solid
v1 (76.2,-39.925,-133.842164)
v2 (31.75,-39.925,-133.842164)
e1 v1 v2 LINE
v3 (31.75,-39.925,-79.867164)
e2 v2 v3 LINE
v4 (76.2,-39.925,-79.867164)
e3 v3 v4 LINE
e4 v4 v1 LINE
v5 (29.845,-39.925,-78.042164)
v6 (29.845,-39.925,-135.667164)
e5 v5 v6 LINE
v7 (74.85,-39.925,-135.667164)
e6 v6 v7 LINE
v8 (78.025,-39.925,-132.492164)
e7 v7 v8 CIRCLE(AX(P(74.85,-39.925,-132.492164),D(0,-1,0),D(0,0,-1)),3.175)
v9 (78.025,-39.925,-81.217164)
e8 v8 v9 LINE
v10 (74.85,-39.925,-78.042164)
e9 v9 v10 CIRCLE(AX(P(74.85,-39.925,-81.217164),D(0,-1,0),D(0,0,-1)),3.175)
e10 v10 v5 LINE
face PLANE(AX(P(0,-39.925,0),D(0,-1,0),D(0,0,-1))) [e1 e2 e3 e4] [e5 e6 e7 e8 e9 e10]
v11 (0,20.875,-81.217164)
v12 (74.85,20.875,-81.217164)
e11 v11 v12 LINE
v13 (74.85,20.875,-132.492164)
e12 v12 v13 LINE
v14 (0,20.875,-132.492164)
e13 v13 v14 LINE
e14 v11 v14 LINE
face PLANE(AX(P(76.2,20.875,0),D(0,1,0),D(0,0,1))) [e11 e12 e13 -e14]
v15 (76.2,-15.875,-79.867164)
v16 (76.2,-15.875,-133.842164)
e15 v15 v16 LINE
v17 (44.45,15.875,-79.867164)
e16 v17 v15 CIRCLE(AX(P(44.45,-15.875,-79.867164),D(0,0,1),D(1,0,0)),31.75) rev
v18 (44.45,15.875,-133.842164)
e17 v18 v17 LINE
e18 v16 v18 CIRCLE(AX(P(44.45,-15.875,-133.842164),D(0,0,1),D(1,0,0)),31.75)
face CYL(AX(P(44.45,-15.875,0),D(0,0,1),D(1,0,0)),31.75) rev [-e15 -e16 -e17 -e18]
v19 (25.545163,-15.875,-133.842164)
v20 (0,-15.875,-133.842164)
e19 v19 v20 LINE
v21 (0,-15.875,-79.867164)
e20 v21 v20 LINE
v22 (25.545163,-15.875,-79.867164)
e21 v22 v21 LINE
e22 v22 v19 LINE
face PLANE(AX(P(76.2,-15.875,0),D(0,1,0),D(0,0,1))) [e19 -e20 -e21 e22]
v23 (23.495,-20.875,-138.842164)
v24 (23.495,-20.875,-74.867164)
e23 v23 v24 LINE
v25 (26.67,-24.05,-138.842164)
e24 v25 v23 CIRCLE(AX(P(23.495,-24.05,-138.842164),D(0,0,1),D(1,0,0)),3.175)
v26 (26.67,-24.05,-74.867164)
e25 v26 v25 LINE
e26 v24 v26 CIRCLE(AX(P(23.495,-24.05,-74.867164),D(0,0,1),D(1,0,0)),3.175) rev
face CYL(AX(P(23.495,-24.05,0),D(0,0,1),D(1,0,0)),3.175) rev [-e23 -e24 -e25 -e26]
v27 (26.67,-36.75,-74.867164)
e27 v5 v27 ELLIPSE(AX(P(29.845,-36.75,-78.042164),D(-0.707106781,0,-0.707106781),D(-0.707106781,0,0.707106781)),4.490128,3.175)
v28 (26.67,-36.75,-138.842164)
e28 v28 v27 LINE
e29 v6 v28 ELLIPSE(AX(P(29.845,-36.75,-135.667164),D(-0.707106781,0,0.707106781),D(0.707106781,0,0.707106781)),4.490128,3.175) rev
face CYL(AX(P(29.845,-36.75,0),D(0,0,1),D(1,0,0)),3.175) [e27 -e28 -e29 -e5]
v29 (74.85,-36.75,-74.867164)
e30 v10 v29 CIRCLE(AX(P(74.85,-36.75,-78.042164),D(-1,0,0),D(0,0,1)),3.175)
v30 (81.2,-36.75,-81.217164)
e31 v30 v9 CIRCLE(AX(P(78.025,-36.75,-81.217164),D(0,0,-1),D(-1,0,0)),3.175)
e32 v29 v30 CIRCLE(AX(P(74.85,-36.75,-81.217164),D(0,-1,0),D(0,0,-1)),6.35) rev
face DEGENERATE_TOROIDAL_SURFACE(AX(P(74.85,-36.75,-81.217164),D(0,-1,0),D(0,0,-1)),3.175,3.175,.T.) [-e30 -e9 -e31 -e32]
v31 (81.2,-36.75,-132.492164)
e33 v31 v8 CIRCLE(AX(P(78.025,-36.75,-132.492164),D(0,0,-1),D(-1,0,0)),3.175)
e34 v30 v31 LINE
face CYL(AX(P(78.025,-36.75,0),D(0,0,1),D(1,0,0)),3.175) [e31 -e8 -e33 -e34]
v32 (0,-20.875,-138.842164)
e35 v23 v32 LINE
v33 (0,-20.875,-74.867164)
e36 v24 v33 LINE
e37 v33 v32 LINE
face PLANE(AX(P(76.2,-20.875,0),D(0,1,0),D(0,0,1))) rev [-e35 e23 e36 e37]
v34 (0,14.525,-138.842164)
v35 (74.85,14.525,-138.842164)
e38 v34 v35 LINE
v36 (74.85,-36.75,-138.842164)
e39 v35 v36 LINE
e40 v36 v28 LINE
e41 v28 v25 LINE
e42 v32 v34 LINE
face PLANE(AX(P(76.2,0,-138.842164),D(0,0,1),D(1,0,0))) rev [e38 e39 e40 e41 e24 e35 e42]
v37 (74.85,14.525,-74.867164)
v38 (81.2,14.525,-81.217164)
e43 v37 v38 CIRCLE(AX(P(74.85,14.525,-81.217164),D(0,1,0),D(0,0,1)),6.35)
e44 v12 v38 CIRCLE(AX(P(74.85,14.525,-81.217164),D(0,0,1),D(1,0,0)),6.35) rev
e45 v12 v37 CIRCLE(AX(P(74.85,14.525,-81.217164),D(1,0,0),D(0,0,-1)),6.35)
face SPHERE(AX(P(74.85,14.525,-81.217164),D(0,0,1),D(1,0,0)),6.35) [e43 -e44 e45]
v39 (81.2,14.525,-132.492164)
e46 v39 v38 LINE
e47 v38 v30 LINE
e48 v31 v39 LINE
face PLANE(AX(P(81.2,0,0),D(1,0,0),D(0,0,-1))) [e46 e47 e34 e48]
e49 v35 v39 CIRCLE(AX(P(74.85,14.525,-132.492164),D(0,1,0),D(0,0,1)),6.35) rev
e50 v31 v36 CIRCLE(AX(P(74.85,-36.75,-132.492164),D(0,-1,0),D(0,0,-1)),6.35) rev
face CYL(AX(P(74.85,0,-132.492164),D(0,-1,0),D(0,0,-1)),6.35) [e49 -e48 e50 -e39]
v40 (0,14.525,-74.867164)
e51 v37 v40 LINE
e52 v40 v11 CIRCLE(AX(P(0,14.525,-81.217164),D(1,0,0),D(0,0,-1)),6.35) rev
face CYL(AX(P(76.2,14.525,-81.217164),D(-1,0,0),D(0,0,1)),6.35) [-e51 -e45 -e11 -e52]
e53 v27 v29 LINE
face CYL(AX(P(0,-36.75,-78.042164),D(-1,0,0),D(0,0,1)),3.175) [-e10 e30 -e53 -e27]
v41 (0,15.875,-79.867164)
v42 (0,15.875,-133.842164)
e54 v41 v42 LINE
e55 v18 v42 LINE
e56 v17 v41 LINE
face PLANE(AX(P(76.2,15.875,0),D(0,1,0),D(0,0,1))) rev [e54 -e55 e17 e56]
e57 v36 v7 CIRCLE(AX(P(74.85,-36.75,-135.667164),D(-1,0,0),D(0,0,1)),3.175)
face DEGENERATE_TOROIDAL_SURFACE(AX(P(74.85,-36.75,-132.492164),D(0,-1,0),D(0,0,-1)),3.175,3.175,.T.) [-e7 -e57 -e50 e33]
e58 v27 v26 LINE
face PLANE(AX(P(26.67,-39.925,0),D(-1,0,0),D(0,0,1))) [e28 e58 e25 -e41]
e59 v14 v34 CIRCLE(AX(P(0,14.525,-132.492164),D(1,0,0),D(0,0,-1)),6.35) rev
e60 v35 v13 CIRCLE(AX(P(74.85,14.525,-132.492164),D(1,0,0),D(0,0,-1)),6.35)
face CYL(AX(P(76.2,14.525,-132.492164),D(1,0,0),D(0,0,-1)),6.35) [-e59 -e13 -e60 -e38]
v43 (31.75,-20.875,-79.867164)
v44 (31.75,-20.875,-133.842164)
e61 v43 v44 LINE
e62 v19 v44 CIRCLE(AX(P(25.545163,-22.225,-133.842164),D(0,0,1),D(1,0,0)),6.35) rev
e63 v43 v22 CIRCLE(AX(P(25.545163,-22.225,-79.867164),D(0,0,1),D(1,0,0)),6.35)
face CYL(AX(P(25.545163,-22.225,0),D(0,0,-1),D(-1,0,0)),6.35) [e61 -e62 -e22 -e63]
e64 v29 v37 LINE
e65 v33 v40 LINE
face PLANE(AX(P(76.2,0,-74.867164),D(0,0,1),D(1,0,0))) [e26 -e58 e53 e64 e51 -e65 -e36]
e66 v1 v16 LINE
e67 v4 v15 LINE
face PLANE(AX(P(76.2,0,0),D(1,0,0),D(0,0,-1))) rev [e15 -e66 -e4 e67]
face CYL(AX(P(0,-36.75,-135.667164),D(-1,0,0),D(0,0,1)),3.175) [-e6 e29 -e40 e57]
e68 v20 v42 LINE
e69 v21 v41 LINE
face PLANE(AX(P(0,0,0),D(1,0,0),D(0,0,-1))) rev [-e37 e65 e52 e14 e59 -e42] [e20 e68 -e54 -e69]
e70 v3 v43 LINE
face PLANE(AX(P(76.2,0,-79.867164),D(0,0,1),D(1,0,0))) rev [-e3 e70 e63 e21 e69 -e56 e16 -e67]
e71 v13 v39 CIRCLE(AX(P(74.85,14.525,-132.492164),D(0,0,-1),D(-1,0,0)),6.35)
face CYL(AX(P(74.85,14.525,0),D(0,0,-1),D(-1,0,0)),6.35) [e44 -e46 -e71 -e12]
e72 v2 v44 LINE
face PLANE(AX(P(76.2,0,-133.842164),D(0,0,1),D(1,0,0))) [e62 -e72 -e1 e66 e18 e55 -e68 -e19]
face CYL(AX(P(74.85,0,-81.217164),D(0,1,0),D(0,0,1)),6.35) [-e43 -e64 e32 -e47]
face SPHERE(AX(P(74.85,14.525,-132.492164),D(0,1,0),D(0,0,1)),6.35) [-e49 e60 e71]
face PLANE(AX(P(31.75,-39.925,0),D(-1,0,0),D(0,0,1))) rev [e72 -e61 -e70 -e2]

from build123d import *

# Parameters (mm, degrees)
SKETCH1_W           = 53.975
SKETCH1_H           = 31.75
BOSS_EXTRUDE1_DEPTH = 76.2
SHELL1_T            = 5
SKETCH2_W           = 44.45
SKETCH2_H           = 53.975
CUT_EXTRUDE1_DEPTH  = 5
FILLET1_R           = 31.75
FILLET2_R           = 6.35
FILLET3_R           = 6.35
SKETCH3_W           = 44.45
SKETCH3_H           = 53.975
BOSS_EXTRUDE2_DEPTH = 19.05
FILLET5_R           = 3.175
FILLET6_R           = 3.175


with BuildPart() as part:
    # Sketch1 → Boss-Extrude1 (new body)
    with BuildSketch(Plane(origin=(0, 0, 0), x_dir=(0, 0, -1), z_dir=(1, 0, 0))):
        with Locations((106.854663617, 0)):
            Rectangle(SKETCH1_W, SKETCH1_H)
    extrude(amount=BOSS_EXTRUDE1_DEPTH)

    # Shell1
    shell1_openings = [part.faces().sort_by_distance(p)[0] for p in [
        (0, 0, -106.854663617),
    ]]
    offset(amount=SHELL1_T, openings=shell1_openings, kind=Kind.INTERSECTION)

    # Sketch2 → Cut-Extrude1 (cut)
    with BuildSketch(Plane(origin=(0, -20.875, 0), x_dir=(-1, 0, 0), z_dir=(0, -1, 0))):
        with Locations((-53.975, 106.854663617)):
            Rectangle(SKETCH2_W, SKETCH2_H)
    extrude(amount=-CUT_EXTRUDE1_DEPTH, mode=Mode.SUBTRACT)

    # Fillet1
    fillet1_edges = [part.edges().sort_by_distance(p)[0] for p in [
        (76.2, 15.875, -106.854663617),
    ]]
    fillet(fillet1_edges, radius=FILLET1_R)

    # Fillet2
    # the kernel refuses this fillet: 6.35 mm, written as the material it takes off along each edge
    with BuildSketch(Plane(origin=(31.75, -15.875, -79.867163617), x_dir=(-1, 0, 0), z_dir=(0, 0, -1))) as fillet2_piece_1:
        with BuildLine():
            CenterArc((6.204836823, -6.35), FILLET2_R, 90, 77.725329785)
            Line((0, -5), (0, 0))
            Line((0, 0), (6.204836823, 0))
        make_face()
    extrude(amount=53.975, mode=Mode.SUBTRACT)

    # Fillet3
    fillet3_edges = [part.edges().sort_by_distance(p)[0] for p in [
        (81.2, 0, -138.842163617),
        (81.2, 20.875, -106.854663617),
        (81.2, 0, -74.867163617),
        (40.6, 20.875, -74.867163617),
        (40.6, 20.875, -138.842163617),
    ]]
    fillet(fillet3_edges, radius=FILLET3_R)

    # Sketch3 → Boss-Extrude2 (add)
    with BuildSketch(Plane.XZ.offset(20.875)):
        with BuildLine():
            Line((26.67, -74.867163617), (26.67, -138.842163617))
            Line((26.67, -138.842163617), (74.85, -138.842163617))
            ThreePointArc((74.85, -138.842163617), (79.340128061, -136.982291678), (81.2, -132.492163617))
            Line((81.2, -132.492163617), (81.2, -81.217163617))
            ThreePointArc((81.2, -81.217163617), (79.340128061, -76.727035557), (74.85, -74.867163617))
            Line((74.85, -74.867163617), (26.67, -74.867163617))
        make_face()
        with Locations((53.975, -106.854663617)):
            Rectangle(SKETCH3_W, SKETCH3_H, mode=Mode.SUBTRACT)
    extrude(amount=BOSS_EXTRUDE2_DEPTH)

    # Fillet5
    fillet5_edges = [part.edges().sort_by_distance(p)[0] for p in [
        (26.67, -20.875, -106.854663617),
    ]]
    fillet(fillet5_edges, radius=FILLET5_R)

    # Fillet6
    fillet6_edges = [part.edges().sort_by_distance(p)[0] for p in [
        (26.67, -39.925, -106.854663617),
        (50.76, -39.925, -138.842163617),
        (79.340128061, -39.925, -136.982291678),
        (81.2, -39.925, -106.854663617),
        (79.340128061, -39.925, -76.727035557),
        (50.76, -39.925, -74.867163617),
    ]]
    fillet(fillet6_edges, radius=FILLET6_R)


solid = part.part
